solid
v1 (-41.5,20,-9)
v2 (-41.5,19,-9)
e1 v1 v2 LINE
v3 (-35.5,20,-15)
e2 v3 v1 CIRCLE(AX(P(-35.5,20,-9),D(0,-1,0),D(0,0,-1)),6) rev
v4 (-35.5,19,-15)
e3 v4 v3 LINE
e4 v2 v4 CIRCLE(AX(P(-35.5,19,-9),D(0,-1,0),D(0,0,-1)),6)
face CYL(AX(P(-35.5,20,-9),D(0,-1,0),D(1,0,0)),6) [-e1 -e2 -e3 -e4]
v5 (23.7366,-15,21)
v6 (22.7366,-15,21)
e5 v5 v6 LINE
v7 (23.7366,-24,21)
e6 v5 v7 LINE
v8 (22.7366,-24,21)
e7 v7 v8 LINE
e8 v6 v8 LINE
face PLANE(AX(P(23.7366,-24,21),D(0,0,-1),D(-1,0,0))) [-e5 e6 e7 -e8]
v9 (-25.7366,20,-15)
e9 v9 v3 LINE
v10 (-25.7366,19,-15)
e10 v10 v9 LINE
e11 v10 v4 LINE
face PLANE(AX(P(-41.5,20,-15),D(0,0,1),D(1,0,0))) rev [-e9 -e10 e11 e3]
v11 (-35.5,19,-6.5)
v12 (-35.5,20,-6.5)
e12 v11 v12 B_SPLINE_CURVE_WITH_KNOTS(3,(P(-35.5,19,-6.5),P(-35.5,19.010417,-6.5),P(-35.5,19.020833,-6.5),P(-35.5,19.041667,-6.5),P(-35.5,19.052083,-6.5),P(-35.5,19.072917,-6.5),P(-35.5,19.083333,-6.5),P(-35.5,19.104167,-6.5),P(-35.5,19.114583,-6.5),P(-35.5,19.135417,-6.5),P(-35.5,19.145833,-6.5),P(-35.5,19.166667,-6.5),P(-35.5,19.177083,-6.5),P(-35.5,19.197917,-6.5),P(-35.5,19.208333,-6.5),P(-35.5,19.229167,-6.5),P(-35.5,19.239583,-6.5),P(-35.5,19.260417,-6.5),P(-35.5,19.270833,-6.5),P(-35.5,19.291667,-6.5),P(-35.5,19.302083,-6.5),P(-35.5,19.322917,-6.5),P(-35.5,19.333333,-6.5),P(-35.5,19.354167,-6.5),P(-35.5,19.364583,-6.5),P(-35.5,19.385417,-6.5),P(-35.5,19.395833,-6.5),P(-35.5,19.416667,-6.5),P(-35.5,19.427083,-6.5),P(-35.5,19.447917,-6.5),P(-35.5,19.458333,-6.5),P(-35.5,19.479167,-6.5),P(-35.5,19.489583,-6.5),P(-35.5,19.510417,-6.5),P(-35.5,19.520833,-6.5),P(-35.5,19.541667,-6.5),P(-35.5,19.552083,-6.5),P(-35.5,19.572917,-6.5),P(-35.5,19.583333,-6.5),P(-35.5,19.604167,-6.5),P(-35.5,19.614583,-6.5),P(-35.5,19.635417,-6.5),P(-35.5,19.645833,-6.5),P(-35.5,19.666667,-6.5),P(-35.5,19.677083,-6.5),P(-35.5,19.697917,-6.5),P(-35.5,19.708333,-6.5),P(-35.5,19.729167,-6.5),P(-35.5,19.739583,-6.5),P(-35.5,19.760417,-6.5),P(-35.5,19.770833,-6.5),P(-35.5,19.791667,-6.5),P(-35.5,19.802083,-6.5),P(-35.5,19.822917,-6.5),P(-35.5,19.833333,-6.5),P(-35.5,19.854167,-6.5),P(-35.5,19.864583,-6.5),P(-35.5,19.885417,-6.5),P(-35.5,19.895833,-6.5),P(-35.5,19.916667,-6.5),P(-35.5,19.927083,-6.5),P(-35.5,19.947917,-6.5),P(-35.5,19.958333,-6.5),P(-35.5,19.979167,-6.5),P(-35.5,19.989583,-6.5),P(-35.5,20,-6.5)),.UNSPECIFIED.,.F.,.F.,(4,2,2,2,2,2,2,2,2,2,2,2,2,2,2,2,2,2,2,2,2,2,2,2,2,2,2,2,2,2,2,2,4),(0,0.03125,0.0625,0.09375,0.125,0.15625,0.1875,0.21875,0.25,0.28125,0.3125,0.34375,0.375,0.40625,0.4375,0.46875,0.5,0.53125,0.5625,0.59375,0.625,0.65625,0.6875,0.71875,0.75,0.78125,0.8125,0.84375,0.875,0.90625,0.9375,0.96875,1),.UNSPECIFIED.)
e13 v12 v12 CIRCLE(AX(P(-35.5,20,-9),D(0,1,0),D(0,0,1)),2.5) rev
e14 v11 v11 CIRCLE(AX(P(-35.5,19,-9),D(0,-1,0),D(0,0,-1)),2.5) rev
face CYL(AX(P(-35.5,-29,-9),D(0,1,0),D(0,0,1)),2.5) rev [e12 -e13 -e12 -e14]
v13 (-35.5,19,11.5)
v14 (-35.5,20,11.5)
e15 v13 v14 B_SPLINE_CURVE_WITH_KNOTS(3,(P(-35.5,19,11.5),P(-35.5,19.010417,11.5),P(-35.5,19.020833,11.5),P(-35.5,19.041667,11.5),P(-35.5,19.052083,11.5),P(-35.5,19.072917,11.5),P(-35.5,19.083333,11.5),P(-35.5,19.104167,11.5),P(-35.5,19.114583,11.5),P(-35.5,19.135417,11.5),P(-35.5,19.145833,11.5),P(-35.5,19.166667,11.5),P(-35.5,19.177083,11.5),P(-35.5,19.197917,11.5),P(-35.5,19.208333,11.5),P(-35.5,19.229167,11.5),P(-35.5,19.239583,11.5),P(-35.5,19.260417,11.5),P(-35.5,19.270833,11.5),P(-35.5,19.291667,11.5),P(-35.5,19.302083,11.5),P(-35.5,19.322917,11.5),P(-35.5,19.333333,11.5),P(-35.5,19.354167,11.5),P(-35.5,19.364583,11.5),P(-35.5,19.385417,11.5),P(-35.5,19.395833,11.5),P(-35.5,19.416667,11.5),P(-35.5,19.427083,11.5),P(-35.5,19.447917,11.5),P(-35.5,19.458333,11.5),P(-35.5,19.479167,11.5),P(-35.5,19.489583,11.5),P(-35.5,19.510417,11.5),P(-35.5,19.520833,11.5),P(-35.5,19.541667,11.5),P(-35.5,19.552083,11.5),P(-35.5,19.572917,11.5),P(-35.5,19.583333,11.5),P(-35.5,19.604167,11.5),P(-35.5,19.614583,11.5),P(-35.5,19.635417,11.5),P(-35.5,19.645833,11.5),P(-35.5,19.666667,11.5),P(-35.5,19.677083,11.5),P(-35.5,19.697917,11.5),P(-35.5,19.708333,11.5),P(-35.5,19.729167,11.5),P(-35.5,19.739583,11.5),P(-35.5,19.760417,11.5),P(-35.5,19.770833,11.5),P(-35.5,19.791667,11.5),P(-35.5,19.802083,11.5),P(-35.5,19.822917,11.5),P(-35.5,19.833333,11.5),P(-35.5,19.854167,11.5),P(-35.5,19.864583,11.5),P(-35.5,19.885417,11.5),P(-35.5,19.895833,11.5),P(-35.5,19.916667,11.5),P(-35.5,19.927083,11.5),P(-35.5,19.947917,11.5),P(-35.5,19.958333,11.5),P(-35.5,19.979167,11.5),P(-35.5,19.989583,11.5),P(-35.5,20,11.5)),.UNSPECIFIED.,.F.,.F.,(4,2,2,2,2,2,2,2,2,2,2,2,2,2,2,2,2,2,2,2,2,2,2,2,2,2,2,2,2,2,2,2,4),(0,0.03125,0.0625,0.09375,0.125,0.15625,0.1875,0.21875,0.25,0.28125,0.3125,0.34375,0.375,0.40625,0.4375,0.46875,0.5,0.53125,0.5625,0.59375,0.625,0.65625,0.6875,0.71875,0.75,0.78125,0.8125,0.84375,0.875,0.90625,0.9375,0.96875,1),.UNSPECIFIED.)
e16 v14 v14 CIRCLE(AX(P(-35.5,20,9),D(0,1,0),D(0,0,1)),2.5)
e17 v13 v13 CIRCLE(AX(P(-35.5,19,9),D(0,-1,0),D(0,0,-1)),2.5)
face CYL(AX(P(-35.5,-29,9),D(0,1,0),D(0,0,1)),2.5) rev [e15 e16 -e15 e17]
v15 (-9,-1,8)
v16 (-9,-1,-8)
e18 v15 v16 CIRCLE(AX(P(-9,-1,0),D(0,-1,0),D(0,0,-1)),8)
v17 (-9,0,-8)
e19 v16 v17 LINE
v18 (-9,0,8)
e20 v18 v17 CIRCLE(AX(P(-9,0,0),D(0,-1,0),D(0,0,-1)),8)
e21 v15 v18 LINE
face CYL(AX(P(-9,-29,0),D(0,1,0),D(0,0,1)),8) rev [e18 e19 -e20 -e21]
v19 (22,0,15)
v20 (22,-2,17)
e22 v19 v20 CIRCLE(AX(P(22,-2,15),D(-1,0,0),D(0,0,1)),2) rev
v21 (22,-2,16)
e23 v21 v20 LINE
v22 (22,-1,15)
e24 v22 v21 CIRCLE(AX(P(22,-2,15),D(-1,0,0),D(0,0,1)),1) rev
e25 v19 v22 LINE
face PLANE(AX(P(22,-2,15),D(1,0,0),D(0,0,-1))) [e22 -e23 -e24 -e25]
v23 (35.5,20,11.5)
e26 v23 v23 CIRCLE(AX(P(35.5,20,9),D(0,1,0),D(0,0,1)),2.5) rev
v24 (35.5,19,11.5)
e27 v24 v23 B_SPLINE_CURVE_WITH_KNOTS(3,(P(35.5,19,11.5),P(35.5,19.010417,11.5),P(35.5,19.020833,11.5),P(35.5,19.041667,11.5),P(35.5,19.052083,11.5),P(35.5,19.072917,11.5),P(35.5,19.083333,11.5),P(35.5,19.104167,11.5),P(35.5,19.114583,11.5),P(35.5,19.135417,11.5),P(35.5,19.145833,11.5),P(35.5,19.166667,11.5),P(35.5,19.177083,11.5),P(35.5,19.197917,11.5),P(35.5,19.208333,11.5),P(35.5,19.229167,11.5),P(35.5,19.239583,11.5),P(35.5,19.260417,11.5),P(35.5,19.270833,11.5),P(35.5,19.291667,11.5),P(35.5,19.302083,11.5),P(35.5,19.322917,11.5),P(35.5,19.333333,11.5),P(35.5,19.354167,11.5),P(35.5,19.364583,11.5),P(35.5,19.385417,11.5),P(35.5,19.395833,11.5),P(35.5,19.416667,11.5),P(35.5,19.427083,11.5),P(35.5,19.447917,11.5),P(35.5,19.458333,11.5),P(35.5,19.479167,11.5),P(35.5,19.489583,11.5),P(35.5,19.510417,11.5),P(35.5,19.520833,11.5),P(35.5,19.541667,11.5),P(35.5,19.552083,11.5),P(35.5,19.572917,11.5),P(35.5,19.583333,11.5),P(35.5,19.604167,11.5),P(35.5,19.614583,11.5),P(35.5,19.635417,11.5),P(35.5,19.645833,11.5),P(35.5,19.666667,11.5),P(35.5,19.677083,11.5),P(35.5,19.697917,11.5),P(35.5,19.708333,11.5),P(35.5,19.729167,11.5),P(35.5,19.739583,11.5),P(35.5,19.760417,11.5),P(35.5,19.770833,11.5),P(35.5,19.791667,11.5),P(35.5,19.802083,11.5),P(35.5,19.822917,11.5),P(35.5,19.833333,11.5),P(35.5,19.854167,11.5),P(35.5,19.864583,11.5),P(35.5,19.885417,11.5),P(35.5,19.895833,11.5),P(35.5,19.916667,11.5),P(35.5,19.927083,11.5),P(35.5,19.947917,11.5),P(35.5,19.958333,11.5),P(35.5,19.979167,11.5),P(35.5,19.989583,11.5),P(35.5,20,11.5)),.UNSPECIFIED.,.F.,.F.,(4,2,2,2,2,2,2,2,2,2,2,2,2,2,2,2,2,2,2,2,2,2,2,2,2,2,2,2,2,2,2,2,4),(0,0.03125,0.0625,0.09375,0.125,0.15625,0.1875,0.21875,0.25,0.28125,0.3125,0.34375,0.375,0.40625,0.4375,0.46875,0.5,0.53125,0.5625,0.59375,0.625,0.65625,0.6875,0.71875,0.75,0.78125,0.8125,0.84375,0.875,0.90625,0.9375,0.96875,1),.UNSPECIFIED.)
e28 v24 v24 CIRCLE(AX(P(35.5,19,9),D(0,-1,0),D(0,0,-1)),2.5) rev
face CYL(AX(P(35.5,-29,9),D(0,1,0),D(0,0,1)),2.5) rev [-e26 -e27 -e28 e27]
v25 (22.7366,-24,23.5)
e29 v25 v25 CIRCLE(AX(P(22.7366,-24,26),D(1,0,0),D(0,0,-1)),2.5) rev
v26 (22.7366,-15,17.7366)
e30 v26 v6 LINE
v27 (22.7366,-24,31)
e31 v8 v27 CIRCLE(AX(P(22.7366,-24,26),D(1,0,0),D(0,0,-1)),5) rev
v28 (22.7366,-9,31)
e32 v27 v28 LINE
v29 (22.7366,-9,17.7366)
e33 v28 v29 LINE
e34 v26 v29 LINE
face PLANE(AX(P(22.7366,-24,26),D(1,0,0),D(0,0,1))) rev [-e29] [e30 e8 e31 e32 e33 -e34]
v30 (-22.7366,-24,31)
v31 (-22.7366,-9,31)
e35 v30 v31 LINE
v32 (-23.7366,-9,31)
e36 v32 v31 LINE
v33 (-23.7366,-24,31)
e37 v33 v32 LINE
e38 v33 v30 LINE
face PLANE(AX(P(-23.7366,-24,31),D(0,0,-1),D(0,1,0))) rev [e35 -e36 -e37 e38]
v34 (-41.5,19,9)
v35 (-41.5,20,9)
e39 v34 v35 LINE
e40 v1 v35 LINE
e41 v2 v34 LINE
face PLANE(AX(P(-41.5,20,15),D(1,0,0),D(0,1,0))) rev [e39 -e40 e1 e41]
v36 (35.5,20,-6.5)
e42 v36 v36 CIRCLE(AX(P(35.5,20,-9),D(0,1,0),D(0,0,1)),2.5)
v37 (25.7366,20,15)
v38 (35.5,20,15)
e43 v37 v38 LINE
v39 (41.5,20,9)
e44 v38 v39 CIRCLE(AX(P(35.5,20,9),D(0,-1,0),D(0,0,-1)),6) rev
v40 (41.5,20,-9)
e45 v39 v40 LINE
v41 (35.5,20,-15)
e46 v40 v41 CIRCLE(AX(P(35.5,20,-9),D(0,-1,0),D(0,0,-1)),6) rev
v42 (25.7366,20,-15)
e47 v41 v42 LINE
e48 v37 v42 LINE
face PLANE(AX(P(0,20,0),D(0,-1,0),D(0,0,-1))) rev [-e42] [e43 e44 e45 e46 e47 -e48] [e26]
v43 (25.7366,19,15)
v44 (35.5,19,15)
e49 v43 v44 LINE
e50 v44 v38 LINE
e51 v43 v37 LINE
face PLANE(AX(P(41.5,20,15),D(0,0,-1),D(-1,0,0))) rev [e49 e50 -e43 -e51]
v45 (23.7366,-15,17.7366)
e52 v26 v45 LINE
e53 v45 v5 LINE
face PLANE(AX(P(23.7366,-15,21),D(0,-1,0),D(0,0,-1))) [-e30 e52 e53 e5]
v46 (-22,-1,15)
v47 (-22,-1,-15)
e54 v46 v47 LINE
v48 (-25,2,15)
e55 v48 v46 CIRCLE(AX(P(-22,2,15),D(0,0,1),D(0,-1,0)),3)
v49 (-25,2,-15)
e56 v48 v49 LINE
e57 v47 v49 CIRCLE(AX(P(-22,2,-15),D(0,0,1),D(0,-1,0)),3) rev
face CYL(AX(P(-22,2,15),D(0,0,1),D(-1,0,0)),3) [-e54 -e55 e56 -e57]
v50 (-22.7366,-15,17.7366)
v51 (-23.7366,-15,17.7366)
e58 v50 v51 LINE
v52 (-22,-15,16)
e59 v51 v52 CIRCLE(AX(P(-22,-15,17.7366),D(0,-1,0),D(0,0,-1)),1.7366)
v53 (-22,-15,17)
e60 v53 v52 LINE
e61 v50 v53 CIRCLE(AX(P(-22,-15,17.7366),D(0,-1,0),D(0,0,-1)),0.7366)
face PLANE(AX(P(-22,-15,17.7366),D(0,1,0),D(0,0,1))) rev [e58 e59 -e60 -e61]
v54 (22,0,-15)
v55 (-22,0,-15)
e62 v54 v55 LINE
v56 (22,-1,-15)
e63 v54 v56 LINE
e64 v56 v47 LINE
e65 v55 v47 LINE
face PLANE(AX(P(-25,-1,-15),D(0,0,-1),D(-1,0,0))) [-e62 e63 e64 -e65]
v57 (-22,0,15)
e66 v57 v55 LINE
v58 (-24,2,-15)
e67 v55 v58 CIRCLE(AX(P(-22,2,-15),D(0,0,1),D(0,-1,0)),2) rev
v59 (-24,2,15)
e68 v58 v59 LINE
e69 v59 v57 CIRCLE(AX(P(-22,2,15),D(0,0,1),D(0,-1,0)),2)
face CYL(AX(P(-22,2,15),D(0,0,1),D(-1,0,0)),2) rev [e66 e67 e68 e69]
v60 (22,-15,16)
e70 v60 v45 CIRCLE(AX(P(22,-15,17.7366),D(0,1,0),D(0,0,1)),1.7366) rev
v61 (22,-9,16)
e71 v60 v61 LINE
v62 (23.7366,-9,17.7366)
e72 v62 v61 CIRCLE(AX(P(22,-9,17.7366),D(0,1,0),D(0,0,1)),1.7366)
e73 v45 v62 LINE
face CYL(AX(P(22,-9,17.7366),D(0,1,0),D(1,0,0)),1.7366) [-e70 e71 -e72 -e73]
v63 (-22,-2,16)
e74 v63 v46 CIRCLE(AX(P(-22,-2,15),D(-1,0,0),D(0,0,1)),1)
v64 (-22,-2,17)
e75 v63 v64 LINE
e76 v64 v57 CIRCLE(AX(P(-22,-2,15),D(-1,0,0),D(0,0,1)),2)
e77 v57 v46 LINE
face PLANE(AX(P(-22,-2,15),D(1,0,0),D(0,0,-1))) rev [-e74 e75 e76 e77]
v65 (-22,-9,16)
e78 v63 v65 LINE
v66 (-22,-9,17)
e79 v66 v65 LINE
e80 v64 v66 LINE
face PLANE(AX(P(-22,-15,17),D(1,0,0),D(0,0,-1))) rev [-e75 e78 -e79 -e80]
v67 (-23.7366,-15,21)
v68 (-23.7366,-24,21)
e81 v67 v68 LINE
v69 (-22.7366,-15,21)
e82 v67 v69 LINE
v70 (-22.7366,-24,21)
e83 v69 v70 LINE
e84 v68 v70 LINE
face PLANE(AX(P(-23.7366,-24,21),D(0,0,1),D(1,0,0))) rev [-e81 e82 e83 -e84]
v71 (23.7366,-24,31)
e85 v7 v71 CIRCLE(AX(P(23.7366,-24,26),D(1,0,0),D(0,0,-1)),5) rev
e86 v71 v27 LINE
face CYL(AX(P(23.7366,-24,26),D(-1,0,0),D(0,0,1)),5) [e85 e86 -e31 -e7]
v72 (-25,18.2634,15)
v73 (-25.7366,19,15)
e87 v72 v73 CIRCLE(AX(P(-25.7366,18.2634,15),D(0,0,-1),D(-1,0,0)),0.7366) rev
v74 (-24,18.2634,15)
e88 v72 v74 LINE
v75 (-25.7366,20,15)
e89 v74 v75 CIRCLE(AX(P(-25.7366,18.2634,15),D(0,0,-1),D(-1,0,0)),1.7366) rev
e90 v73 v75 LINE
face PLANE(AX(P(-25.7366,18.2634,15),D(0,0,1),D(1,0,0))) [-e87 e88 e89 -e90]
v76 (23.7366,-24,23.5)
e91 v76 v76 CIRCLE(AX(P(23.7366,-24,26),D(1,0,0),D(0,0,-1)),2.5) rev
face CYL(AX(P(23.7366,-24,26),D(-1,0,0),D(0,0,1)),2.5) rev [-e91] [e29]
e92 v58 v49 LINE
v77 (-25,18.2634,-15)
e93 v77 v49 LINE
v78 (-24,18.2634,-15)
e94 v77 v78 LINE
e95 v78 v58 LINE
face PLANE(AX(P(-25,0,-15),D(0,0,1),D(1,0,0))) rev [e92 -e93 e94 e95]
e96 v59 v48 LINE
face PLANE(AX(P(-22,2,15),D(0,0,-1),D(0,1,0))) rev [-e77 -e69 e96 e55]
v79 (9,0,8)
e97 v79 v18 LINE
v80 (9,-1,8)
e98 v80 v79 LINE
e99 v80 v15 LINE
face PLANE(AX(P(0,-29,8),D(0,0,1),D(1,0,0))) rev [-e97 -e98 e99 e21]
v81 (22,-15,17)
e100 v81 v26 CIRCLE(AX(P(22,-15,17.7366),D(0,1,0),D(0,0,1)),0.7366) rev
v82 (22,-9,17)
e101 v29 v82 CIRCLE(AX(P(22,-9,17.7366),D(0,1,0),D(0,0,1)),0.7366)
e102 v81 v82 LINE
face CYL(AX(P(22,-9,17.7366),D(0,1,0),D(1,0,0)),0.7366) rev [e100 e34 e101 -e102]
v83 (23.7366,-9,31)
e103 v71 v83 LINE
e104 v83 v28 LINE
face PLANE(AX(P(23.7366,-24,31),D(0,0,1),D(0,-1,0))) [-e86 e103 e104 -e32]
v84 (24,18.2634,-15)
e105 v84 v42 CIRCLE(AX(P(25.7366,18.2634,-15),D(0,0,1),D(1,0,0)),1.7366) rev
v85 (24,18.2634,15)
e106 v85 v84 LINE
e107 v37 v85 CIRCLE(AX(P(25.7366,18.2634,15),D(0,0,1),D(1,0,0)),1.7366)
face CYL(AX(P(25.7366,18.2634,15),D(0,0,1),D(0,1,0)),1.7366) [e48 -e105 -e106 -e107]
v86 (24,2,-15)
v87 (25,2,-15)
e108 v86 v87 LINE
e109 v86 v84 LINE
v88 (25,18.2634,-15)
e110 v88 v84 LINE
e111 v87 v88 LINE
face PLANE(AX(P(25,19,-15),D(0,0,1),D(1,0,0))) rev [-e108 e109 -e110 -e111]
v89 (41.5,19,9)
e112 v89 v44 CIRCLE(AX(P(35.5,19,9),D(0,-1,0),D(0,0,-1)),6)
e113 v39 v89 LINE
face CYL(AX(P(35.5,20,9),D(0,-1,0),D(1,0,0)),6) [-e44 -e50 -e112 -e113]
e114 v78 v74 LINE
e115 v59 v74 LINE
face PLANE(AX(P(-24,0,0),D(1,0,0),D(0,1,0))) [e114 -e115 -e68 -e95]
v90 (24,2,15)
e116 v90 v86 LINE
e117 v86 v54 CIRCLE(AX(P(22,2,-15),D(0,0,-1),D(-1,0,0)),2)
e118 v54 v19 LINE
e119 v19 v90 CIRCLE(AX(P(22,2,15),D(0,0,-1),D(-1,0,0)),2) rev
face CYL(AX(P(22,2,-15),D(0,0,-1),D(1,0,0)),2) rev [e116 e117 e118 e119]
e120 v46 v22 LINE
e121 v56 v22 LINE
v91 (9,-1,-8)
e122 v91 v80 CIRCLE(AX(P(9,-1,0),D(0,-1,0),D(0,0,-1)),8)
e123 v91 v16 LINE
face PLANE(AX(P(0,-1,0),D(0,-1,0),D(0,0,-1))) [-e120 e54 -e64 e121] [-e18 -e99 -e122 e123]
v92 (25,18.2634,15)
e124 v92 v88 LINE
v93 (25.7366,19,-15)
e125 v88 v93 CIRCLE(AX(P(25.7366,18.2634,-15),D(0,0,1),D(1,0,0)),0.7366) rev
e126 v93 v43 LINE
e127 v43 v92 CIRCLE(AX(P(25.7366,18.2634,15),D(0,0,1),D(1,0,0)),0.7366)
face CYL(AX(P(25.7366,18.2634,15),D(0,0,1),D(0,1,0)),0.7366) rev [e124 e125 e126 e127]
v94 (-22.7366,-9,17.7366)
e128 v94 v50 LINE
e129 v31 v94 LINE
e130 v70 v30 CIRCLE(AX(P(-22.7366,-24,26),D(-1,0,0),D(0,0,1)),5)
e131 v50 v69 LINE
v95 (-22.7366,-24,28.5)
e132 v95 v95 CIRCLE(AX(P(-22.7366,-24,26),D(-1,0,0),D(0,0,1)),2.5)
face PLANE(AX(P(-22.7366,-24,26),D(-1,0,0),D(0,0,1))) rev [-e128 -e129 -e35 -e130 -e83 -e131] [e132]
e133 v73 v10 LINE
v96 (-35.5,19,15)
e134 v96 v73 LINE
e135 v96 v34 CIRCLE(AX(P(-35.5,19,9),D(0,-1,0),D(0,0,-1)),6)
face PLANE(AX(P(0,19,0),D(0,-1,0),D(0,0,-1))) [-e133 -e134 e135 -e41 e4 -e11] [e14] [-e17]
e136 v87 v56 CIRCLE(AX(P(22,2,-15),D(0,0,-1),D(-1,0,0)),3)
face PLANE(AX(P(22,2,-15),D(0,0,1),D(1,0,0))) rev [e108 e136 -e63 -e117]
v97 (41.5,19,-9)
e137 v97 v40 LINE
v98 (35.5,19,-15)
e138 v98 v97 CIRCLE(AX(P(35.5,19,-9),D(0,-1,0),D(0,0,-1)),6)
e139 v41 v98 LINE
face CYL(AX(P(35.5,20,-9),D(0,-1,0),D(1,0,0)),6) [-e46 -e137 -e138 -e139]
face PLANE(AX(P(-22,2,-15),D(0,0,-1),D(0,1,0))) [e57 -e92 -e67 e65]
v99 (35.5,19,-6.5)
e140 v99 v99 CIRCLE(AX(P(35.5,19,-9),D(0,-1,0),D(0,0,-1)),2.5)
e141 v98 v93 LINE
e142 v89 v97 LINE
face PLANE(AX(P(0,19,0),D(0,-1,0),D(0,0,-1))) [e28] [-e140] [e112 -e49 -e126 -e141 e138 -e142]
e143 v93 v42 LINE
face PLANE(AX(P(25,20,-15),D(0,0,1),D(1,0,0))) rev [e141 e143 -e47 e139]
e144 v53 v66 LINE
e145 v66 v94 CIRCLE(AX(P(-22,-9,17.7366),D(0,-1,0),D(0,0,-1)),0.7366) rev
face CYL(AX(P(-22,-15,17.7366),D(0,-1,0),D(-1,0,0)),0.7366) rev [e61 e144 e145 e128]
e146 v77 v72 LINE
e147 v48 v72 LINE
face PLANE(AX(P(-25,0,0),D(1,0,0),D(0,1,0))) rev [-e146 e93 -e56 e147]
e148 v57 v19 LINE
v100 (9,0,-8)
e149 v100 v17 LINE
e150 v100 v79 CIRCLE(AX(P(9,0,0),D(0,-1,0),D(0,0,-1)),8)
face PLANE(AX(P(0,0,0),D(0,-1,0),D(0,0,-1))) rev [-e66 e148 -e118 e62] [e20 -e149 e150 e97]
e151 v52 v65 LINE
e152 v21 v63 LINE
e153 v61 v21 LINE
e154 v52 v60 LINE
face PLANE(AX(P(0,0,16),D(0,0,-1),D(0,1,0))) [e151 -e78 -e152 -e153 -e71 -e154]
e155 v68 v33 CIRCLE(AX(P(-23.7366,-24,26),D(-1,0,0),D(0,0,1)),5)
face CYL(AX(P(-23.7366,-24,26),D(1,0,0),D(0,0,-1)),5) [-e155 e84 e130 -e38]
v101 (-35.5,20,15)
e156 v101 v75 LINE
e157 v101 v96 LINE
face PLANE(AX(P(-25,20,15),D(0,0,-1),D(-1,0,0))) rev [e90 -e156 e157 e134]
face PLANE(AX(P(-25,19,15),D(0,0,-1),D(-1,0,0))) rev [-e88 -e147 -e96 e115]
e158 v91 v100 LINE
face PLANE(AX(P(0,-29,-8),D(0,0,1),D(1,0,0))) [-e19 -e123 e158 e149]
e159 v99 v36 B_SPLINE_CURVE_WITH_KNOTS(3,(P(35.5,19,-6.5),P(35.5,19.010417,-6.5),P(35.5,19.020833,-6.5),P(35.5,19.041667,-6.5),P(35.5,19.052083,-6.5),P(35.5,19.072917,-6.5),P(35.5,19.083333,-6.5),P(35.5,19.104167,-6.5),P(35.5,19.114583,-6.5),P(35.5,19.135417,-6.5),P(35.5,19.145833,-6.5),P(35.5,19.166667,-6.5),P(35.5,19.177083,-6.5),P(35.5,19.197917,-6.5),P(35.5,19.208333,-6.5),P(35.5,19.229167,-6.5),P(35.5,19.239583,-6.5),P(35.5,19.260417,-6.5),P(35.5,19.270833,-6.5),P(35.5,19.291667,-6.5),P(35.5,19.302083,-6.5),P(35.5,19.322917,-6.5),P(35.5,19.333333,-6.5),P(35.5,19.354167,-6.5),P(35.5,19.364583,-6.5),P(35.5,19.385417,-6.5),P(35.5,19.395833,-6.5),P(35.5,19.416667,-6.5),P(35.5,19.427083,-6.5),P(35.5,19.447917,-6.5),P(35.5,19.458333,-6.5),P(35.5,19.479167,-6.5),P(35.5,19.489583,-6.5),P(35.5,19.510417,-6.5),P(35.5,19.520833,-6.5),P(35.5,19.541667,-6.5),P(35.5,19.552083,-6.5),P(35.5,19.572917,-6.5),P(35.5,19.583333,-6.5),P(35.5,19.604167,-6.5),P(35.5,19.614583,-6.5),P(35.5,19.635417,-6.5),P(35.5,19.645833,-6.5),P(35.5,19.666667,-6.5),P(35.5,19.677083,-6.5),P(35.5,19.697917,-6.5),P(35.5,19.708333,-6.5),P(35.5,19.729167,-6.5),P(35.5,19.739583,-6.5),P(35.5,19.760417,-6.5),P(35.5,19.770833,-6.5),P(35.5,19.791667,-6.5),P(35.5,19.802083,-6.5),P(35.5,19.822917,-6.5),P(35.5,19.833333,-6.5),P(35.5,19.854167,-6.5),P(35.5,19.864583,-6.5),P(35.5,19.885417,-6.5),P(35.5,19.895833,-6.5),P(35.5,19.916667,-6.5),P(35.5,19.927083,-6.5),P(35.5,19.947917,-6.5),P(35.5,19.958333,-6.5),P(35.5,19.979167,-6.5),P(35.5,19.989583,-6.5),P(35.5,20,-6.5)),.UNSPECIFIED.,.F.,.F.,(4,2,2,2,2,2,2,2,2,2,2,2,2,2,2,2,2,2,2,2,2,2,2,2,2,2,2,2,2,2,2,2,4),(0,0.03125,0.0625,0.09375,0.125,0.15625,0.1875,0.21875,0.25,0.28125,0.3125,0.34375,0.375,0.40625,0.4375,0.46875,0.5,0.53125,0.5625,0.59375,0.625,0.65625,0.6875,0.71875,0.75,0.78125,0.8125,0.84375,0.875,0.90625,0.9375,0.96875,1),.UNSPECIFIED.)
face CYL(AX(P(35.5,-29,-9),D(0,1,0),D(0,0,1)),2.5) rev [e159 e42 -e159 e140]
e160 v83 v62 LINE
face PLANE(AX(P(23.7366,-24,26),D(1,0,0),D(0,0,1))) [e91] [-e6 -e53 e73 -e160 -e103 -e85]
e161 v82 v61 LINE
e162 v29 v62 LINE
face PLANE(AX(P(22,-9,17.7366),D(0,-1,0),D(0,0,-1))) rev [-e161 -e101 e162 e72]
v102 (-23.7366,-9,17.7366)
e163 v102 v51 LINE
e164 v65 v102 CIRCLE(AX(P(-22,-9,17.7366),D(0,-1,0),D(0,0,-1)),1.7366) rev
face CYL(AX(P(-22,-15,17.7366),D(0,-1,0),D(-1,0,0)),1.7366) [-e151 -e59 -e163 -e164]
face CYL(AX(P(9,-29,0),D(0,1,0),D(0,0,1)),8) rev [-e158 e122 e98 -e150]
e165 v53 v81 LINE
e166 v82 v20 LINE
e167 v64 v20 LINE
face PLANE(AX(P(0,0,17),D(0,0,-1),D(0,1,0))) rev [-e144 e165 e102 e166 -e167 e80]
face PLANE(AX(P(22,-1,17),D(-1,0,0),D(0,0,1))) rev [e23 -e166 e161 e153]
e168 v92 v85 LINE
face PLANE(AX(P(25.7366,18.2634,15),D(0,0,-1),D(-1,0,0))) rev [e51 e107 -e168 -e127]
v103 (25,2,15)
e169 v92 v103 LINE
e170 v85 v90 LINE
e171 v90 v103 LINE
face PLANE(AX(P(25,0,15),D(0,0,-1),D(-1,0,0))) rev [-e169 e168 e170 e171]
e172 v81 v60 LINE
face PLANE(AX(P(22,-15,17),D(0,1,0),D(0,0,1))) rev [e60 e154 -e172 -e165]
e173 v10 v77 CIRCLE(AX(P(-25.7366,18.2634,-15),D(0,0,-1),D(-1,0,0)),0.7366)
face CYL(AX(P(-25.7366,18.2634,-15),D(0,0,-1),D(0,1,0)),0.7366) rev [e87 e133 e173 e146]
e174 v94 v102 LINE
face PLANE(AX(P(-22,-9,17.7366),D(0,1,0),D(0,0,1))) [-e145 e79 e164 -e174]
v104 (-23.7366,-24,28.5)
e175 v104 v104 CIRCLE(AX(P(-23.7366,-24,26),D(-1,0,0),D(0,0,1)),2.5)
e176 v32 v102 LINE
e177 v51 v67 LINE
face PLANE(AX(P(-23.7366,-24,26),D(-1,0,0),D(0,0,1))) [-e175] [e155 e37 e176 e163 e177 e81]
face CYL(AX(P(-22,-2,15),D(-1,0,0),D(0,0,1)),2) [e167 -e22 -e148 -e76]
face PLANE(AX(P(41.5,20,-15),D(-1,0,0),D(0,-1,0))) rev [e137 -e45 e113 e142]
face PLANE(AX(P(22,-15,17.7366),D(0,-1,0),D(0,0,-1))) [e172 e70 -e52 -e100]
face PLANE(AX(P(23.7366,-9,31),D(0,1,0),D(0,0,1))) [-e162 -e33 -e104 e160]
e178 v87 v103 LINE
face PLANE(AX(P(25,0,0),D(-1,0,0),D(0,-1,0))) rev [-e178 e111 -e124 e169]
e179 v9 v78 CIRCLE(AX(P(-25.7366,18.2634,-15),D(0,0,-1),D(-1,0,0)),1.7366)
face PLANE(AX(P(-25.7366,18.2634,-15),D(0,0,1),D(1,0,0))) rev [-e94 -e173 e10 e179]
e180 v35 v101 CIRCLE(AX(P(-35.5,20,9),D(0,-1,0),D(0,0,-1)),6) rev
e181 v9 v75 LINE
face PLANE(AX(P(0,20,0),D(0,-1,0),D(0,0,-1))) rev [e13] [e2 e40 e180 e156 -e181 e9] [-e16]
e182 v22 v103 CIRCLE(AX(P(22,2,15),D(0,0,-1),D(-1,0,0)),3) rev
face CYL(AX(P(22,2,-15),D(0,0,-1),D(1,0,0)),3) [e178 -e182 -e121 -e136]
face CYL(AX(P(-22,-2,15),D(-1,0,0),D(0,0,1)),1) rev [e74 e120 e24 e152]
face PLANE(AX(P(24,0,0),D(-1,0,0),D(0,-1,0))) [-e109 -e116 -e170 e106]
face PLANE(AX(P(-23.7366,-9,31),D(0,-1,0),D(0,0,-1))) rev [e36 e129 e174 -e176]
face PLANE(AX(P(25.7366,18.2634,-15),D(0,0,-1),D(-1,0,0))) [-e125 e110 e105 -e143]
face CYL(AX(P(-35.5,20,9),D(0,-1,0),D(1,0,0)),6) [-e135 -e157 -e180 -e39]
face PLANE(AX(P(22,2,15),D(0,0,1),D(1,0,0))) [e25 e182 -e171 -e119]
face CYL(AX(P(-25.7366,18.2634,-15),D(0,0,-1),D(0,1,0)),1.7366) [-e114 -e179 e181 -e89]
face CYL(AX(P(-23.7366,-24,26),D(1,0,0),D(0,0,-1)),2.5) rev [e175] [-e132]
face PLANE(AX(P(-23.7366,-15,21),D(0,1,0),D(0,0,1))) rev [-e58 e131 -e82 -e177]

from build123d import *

# Parameters (mm, degrees)
SKETCH1_W                      = 50
SKETCH1_H                      = 30
BASE_FLANGE1_DEPTH             = 1
EDGE_FLANGE1_STRIP_W           = 8
EDGE_FLANGE1_STRIP_H           = 1
EDGE_FLANGE1_STRIP_CUT_DEPTH   = 30
EDGE_FLANGE1_STRIP_2_W         = 8
EDGE_FLANGE1_STRIP_2_H         = 1
EDGE_FLANGE1_STRIP_CUT_2_DEPTH = 30
EDGE_FLANGE1_DEPTH             = 30
EDGE_FLANGE1_BEND_DEPTH        = 30
EDGE_FLANGE2_STRIP_W           = 5.4732
EDGE_FLANGE2_STRIP_H           = 1
EDGE_FLANGE2_STRIP_CUT_DEPTH   = 30
EDGE_FLANGE2_STRIP_2_W         = 5.4732
EDGE_FLANGE2_STRIP_2_H         = 1
EDGE_FLANGE2_STRIP_CUT_2_DEPTH = 30
EDGE_FLANGE2_DEPTH             = 30
EDGE_FLANGE2_BEND_DEPTH        = 30
EDGE_FLANGE3_DEPTH             = 44
EDGE_FLANGE4_DEPTH             = 6
EDGE_FLANGE4_START             = 1
EDGE_FLANGE4_PROFILE_R         = 2.5
EDGE_FLANGE4_FLAT_DEPTH        = 1
CUT_EXTRUDE1_DEPTH             = 60.36539396
CUT_EXTRUDE1_DEPTH_BACK        = 60.36539396
SKETCH38_R                     = 2.5
FILLET1_R                      = 6


# Sheet-metal steps are written as plain solids
with BuildPart() as part:
    # Sketch1 → Base-Flange1 (new body)
    with BuildSketch(Plane(origin=(0, 0, 0), x_dir=(1, 0, 0), z_dir=(0, 1, 0))):
        Rectangle(SKETCH1_W, SKETCH1_H)
    extrude(amount=-BASE_FLANGE1_DEPTH)

    # Edge-Flange1 strip (across the edge) → Edge-Flange1 strip cut (cut)
    with BuildSketch(Plane(origin=(25, 0, 15), x_dir=(-1, 0, 0), z_dir=(0, 0, -1))):
        with Locations((-1, -0.5)):
            Rectangle(EDGE_FLANGE1_STRIP_W, EDGE_FLANGE1_STRIP_H)
    extrude(amount=EDGE_FLANGE1_STRIP_CUT_DEPTH, mode=Mode.SUBTRACT)

    # Edge-Flange1 strip 2 (across the edge) → Edge-Flange1 strip cut 2 (cut)
    with BuildSketch(Plane(origin=(-25, 0, -15), x_dir=(1, 0, 0), z_dir=(0, 0, 1))):
        with Locations((-1, -0.5)):
            Rectangle(EDGE_FLANGE1_STRIP_2_W, EDGE_FLANGE1_STRIP_2_H)
    extrude(amount=EDGE_FLANGE1_STRIP_CUT_2_DEPTH, mode=Mode.SUBTRACT)

    # Edge-Flange1 section (across the edge) → Edge-Flange1 (add)
    with BuildSketch(Plane(origin=(25, 0, 15), x_dir=(-1, 0, 0), z_dir=(0, 0, -1))):
        with BuildLine():
            Line((0, 2), (0, 19))
            Line((0, 19), (1, 19))
            Line((1, 19), (1, 2))
            ThreePointArc((1, 2), (1.585786438, 0.585786438), (3, 0))
            Line((3, 0), (3, -1))
            ThreePointArc((3, -1), (0.878679656, -0.121320344), (0, 2))
        make_face()
    extrude(amount=EDGE_FLANGE1_DEPTH)

    # Edge-Flange1 section 2 (across the edge) → Edge-Flange1 bend (add)
    with BuildSketch(Plane(origin=(-25, 0, -15), x_dir=(1, 0, 0), z_dir=(0, 0, 1))):
        with BuildLine():
            Line((0, 2), (0, 19))
            Line((0, 19), (1, 19))
            Line((1, 19), (1, 2))
            ThreePointArc((1, 2), (1.585786438, 0.585786438), (3, 0))
            Line((3, 0), (3, -1))
            ThreePointArc((3, -1), (0.878679656, -0.121320344), (0, 2))
        make_face()
    extrude(amount=EDGE_FLANGE1_BEND_DEPTH)

    # Edge-Flange2 strip (across the edge) → Edge-Flange2 strip cut (cut)
    with BuildSketch(Plane(origin=(25, 19, -15), x_dir=(0, -1, 0), z_dir=(0, 0, 1))):
        with Locations((-2, -0.5)):
            Rectangle(EDGE_FLANGE2_STRIP_W, EDGE_FLANGE2_STRIP_H)
    extrude(amount=EDGE_FLANGE2_STRIP_CUT_DEPTH, mode=Mode.SUBTRACT)

    # Edge-Flange2 strip 2 (across the edge) → Edge-Flange2 strip cut 2 (cut)
    with BuildSketch(Plane(origin=(-25, 19, 15), x_dir=(0, -1, 0), z_dir=(0, 0, -1))):
        with Locations((-2, -0.5)):
            Rectangle(EDGE_FLANGE2_STRIP_2_W, EDGE_FLANGE2_STRIP_2_H)
    extrude(amount=EDGE_FLANGE2_STRIP_CUT_2_DEPTH, mode=Mode.SUBTRACT)

    # Edge-Flange2 section (across the edge) → Edge-Flange2 (add)
    with BuildSketch(Plane(origin=(25, 19, -15), x_dir=(0, -1, 0), z_dir=(0, 0, 1))):
        with BuildLine():
            Line((-1, 0.7366), (-1, 16.5))
            Line((-1, 16.5), (0, 16.5))
            Line((0, 16.5), (0, 0.7366))
            ThreePointArc((0, 0.7366), (0.215745145, 0.215745145), (0.7366, 0))
            Line((0.7366, 0), (0.7366, -1))
            ThreePointArc((0.7366, -1), (-0.491361636, -0.491361636), (-1, 0.7366))
        make_face()
    extrude(amount=EDGE_FLANGE2_DEPTH)

    # Edge-Flange2 section 2 (across the edge) → Edge-Flange2 bend (add)
    with BuildSketch(Plane(origin=(-25, 19, 15), x_dir=(0, -1, 0), z_dir=(0, 0, -1))):
        with BuildLine():
            Line((-1, 0.7366), (-1, 16.5))
            Line((-1, 16.5), (0, 16.5))
            Line((0, 16.5), (0, 0.7366))
            ThreePointArc((0, 0.7366), (0.215745145, 0.215745145), (0.7366, 0))
            Line((0.7366, 0), (0.7366, -1))
            ThreePointArc((0.7366, -1), (-0.491361636, -0.491361636), (-1, 0.7366))
        make_face()
    extrude(amount=EDGE_FLANGE2_BEND_DEPTH)

    # Edge-Flange3 section (across the edge) → Edge-Flange3 (add)
    with BuildSketch(Plane(origin=(22, -1, 16), x_dir=(0, 0, -1), z_dir=(-1, 0, 0))):
        with BuildLine():
            Line((-1, 1), (-1, 14))
            Line((-1, 14), (0, 14))
            Line((0, 14), (0, 1))
            ThreePointArc((0, 1), (0.292893219, 0.292893219), (1, 0))
            Line((1, 0), (1, -1))
            ThreePointArc((1, -1), (-0.414213562, -0.414213562), (-1, 1))
        make_face()
    extrude(amount=EDGE_FLANGE3_DEPTH)

    # Edge-Flange4 bend section (across the edge) → Edge-Flange4 (add)
    with BuildSketch(Plane(origin=(-22.7366, -9, 17), x_dir=(1, 0, 0), z_dir=(0, -1, 0))):
        with BuildLine():
            Line((-1, 0.7366), (0, 0.7366))
            ThreePointArc((0, 0.7366), (0.215745145, 0.215745145), (0.7366, 0))
            Line((0.7366, 0), (0.7366, -1))
            ThreePointArc((0.7366, -1), (-0.491361636, -0.491361636), (-1, 0.7366))
        make_face()
    edge_flange4 = extrude(amount=EDGE_FLANGE4_DEPTH)

    # Edge-Flange4 profile (on flange) → Edge-Flange4 flat (add)
    with BuildSketch(Plane(origin=(-22.7366, 0, 17), x_dir=(0, -1, 0), z_dir=(-1, 0, 0)).offset(EDGE_FLANGE4_START)):
        with BuildLine():
            Line((9, 14), (9, 0.7366))
            Line((9, 0.7366), (15, 0.7366))
            Line((15, 0.7366), (15, 4))
            Line((15, 4), (24, 4))
            ThreePointArc((24, 4), (29, 9), (24, 14))
            Line((24, 14), (9, 14))
        make_face()
        with Locations((24, 9)):
            Circle(EDGE_FLANGE4_PROFILE_R, mode=Mode.SUBTRACT)
    edge_flange4_flat = extrude(amount=-EDGE_FLANGE4_FLAT_DEPTH)

    # Mirror1: Edge-Flange4, Edge-Flange4 flat across plane
    add(edge_flange4.mirror(Plane(origin=(0, 0, 0), x_dir=(0, 0, 1), z_dir=(1, 0, 0))))
    add(edge_flange4_flat.mirror(Plane(origin=(0, 0, 0), x_dir=(0, 0, 1), z_dir=(1, 0, 0))))

    # Sketch38 → Cut-Extrude1 (cut, two sides: drawn at the far end of the back side and taken through both)
    with BuildSketch(Plane(origin=(0, 0, 0), x_dir=(1, 0, 0), z_dir=(0, 1, 0)).offset(-CUT_EXTRUDE1_DEPTH_BACK)):
        with Locations(Location((-35.5, 9, 0), (0, 0, 270))):
            Circle(SKETCH38_R)
        with Locations(Location((-35.5, -9, 0), (0, 0, 270))):
            Circle(SKETCH38_R)
        with BuildLine():
            Line((-9, -8), (9, -8))
            ThreePointArc((9, -8), (17, 0), (9, 8))
            Line((9, 8), (-9, 8))
            ThreePointArc((-9, 8), (-17, 0), (-9, -8))
        make_face()
        with Locations(Location((35.5, 9, 0), (0, 0, 270))):
            Circle(SKETCH38_R)
        with Locations(Location((35.5, -9, 0), (0, 0, 270))):
            Circle(SKETCH38_R)
    extrude(amount=CUT_EXTRUDE1_DEPTH + CUT_EXTRUDE1_DEPTH_BACK, mode=Mode.SUBTRACT)

    # Fillet1
    fillet1_edges = [part.edges().sort_by_distance(p)[0] for p in [
        (41.5, 19.5, -15),
        (41.5, 19.5, 15),
        (-41.5, 19.5, 15),
        (-41.5, 19.5, -15),
    ]]
    fillet(fillet1_edges, radius=FILLET1_R)


solid = part.part
